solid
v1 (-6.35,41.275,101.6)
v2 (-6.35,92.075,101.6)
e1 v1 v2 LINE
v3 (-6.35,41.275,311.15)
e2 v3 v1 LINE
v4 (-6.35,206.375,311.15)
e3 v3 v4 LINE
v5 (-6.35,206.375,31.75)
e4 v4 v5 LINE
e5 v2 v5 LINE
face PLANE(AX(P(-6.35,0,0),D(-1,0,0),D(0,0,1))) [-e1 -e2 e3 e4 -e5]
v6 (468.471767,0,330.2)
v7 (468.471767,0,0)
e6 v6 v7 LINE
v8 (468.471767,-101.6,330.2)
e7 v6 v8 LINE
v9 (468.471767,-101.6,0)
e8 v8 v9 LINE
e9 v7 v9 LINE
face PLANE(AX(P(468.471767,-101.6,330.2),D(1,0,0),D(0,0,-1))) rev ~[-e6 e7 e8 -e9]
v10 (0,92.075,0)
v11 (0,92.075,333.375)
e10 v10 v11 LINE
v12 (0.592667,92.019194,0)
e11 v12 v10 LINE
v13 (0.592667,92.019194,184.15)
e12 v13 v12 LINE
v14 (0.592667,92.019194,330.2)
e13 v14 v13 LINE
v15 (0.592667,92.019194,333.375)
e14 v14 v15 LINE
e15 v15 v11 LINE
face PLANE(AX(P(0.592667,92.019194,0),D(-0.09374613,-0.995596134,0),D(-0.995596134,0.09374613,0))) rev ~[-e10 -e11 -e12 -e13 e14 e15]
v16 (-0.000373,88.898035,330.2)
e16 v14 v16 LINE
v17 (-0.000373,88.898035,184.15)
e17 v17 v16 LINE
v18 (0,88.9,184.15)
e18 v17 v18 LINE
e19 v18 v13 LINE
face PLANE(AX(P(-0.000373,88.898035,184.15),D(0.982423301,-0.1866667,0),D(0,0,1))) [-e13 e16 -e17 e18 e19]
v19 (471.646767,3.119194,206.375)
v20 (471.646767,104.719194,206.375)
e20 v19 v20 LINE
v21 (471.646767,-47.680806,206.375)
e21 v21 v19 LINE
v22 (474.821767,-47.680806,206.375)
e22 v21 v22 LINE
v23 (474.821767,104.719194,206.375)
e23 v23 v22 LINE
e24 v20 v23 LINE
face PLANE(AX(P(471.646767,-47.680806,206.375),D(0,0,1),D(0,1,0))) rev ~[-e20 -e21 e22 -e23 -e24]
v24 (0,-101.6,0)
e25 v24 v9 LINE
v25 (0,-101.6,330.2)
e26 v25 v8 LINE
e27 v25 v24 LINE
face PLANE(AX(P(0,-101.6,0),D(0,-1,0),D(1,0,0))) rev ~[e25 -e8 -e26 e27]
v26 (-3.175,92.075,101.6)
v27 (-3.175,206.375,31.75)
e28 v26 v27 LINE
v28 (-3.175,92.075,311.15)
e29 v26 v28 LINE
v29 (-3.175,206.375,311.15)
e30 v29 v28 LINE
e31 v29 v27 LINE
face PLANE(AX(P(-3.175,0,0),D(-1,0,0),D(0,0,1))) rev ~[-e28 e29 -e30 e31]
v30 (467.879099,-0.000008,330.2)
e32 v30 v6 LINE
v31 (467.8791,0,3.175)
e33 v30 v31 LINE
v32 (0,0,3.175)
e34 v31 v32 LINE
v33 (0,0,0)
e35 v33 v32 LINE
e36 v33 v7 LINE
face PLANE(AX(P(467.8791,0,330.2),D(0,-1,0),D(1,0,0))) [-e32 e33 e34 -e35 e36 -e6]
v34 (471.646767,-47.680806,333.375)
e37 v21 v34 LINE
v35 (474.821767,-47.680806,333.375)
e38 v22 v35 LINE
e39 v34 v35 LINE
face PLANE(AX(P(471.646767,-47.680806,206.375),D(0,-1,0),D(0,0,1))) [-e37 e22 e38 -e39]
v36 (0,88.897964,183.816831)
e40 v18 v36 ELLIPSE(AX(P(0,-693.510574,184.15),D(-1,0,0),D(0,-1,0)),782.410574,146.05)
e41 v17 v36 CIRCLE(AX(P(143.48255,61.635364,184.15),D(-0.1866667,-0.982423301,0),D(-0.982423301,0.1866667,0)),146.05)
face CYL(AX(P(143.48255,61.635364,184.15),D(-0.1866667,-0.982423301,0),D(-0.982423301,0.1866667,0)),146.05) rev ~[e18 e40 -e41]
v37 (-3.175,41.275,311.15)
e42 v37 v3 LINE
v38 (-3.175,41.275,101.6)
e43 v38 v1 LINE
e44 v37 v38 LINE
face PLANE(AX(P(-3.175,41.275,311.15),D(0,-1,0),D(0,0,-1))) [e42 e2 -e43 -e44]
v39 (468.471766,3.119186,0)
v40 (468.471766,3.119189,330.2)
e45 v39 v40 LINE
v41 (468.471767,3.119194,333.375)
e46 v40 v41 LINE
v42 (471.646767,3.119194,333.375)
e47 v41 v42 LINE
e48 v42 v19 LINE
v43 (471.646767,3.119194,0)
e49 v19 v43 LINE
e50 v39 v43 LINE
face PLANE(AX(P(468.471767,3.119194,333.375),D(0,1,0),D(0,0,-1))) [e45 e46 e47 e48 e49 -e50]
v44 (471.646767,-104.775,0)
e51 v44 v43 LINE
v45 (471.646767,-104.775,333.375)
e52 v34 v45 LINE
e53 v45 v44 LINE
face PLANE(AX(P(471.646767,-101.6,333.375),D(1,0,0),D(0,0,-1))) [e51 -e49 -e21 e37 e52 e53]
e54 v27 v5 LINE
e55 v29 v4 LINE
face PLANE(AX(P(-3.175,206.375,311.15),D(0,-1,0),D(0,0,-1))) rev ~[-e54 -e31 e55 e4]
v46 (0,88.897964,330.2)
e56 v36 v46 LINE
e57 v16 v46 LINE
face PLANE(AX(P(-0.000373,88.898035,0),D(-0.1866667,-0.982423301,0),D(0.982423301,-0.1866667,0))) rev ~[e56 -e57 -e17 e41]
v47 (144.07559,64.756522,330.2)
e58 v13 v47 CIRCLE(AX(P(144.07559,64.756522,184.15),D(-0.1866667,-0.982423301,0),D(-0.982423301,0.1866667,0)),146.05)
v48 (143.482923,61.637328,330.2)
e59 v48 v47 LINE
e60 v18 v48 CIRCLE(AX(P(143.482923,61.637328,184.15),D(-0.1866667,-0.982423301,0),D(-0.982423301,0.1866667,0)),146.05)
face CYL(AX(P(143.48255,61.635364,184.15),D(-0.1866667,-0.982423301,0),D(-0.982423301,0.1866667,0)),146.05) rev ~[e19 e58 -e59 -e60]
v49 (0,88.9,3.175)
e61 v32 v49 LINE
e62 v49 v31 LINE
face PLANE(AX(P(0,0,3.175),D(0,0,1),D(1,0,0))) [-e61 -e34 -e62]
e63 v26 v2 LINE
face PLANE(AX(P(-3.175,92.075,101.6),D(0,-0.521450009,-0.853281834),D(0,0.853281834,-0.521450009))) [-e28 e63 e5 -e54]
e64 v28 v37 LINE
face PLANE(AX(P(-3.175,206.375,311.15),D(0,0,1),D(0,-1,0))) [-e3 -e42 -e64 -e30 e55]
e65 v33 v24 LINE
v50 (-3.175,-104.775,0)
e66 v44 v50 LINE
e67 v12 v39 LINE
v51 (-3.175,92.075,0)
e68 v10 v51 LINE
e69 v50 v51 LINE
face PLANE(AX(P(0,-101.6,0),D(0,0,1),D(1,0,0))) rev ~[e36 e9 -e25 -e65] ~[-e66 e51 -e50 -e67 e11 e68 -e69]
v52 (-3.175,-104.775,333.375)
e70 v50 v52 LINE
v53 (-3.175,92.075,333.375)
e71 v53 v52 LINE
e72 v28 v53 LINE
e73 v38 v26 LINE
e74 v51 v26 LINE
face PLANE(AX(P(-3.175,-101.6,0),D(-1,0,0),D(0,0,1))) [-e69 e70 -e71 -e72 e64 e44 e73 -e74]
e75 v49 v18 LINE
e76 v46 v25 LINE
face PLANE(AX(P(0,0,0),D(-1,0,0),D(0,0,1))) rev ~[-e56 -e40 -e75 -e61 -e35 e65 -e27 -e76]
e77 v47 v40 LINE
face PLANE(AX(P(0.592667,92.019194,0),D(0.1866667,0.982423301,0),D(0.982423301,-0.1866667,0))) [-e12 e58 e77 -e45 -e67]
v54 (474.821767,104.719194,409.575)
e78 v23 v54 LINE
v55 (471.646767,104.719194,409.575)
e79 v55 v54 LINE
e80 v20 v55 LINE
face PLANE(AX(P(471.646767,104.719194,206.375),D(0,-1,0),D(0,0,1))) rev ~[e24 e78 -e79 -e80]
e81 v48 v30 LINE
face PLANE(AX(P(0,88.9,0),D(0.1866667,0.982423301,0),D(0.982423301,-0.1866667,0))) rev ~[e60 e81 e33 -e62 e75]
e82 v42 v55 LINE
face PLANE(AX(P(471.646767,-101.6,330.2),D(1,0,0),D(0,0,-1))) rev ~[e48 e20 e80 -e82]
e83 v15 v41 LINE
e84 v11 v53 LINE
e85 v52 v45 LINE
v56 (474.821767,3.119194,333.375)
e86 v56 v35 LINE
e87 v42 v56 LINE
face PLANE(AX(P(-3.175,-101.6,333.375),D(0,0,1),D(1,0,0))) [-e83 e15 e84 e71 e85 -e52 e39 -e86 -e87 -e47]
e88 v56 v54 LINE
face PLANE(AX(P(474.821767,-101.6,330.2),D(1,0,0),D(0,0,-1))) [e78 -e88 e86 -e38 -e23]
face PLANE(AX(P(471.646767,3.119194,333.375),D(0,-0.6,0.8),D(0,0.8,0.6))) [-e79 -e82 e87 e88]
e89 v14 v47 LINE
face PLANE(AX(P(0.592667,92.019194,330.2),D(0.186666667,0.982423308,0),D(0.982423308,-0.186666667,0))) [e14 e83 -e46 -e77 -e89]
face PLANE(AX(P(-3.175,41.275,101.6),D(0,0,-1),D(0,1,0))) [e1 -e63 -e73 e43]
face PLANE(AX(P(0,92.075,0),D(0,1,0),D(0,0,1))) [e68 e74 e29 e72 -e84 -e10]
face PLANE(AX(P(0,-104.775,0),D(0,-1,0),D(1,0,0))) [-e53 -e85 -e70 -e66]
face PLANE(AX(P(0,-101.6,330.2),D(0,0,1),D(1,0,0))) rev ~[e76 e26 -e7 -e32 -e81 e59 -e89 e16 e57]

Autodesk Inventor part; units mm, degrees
ref_plane "YZ Plane" through (0, 0, 0) normal (1, 0, 0) x (0, 1, 0)
ref_plane "XZ Plane" through (0, 0, 0) normal (0, 1, 0) x (-1, 0, 0)
ref_plane "XY Plane" through (0, 0, 0) normal (0, 0, 1) x (1, 0, 0)
sketch "Sketch1" plane through (0, 0, 0) normal (0, 0, 1) x (1, 0, 0)
  line L0 (0, 0) -> (0, 88.9)
  line L1 (0, 88.9) -> (467.8791, 0)
  line L2 (467.8791, 0) -> (0, 0)
  dimension "d0" = 88.9
  dimension "d4" = 476.25
  dimension "d5" = 90
extrude "Extrusion1" add sketch "Sketch1" along normal blind 3.175
sketch "Sketch2" plane through (0, 88.9, 0) normal (0.1866667, 0.9824233, 0) x (0.9824233, -0.1866667, 0)
  line L0 (0, 0) -> (476.25, 0) projected
  line L1 (0, 0) -> (0, -3.175) projected
  line L2 (476.25, -3.175) -> (0, -3.175) projected
  line L3 (476.25, 0) -> (476.25, -3.175) projected
  line L4 (0, -3.175) -> (0, -330.2)
  line L5 (0, -330.2) -> (476.25, -330.2)
  line L6 (476.25, -330.2) -> (476.25, -3.175)
  point P0 (16.594667, 0)
  dimension "d6" = 330.2
extrude "Extrusion2" add sketch "Sketch2" along normal blind 3.175
sketch "Sketch3" plane through (0, 0, 0) normal (-1, 0, 0) x (0, 0, 1)
  line L0 (0, 0) -> (0, 88.9) projected
  line L1 (0, 0) -> (3.175, 0) projected
  line L2 (3.175, 88.9) -> (3.175, 0) projected
  line L3 (0, 88.9) -> (3.175, 88.9) projected
  line L4 (0, 88.9) -> (0, 92.075)
  line L5 (0, 92.075) -> (330.2, 92.075)
  line L6 (330.2, 92.075) -> (330.2, 0)
  line L7 (330.2, 0) -> (330.2, -101.6)
  line L8 (330.2, -101.6) -> (0, -101.6)
  line L9 (0, -101.6) -> (0, 0)
  dimension "d9" = 3.175
  dimension "d10" = 330.2
  dimension "d11" = 101.6
extrude "Extrusion3" add sketch "Sketch3" along normal blind 3.175
sketch "Sketch4" plane through (0, 0, 0) normal (0, 0, -1) x (-1, 0, 0)
  line L0 (0, 88.9) -> (-0.592667, 92.019194)
  line L1 (0, 92.075) -> (0, 88.9)
  line L2 (-0.592667, 92.019194) -> (0, 92.075)
extrude "Extrusion4" add sketch "Sketch4" against normal blind 330.2
sketch "Sketch5" plane through (0, -101.6, 330.2) normal (0, 0, 1) x (1, 0, 0)
  line L0 (0, 190.5) -> (467.8791, 101.6)
  line L1 (467.8791, 101.6) -> (468.471767, 104.719194)
  line L2 (0.592667, 193.619194) -> (468.471767, 104.719194)
  line L3 (0.592667, 193.619194) -> (0, 193.675)
  line L4 (0, 193.675) -> (-3.175, 193.675)
  line L5 (-3.175, 0) -> (-3.175, 193.675)
  line L6 (0, 0) -> (-3.175, 0)
  line L7 (0, 0) -> (0, 190.5)
  line L8 (468.471767, 104.719194) -> (468.471767, 0)
  line L9 (468.471767, 0) -> (0, 0)
  point P0 (0, 101.6)
extrude "Extrusion5" add sketch "Sketch5" along normal blind 3.175
sketch "Sketch6" plane through (0, -101.6, 330.2) normal (0, 0, -1) x (-1, 0, 0)
  line L0 (-467.8791, 101.6) -> (-468.471767, 104.719194)
  line L1 (-468.471767, 0) -> (-468.471767, 104.719194)
  line L2 (-467.8791, 101.6) -> (-468.471767, 101.6)
  point P0 (0, 101.6)
extrude "Extrusion6" add sketch "Sketch6" along normal blind 330.2
sketch "Sketch7" plane through (468.471767, -101.6, 330.2) normal (1, 0, 0) x (0, 0, -1)
  line L0 (0, 0) -> (0, 101.6)
  line L1 (0, 101.6) -> (330.2, 101.6)
  line L2 (330.2, 104.719194) -> (330.2, 101.6)
  line L3 (-3.175, 104.719194) -> (330.2, 104.719194)
  line L4 (-3.175, 0) -> (-3.175, 104.719194)
  line L5 (0, 0) -> (-3.175, 0)
  line L6 (0, 0) -> (330.2, 0)
  line L7 (330.2, 0) -> (330.2, 101.6)
extrude "Extrusion7" add sketch "Sketch7" along normal blind 3.175
sketch "Sketch8" plane through (0, -101.6, 0) normal (0, -1, 0) x (1, 0, 0)
  line L0 (0, 0) -> (0, 330.2)
  line L1 (471.646767, 333.375) -> (471.646767, 0)
  line L2 (-3.175, 333.375) -> (471.646767, 333.375)
  line L3 (-3.175, 0) -> (-3.175, 333.375)
  line L4 (0, 0) -> (-3.175, 0)
  line L5 (0, 0) -> (471.646767, 0)
extrude "Extrusion8" add sketch "Sketch8" along normal blind 3.175
sketch "Sketch9" plane through (0, 88.9, 0) normal (-0.1866667, -0.9824233, 0) x (0.9824233, -0.1866667, 0)
  line L0 (0, 330.2) -> (476.25, 330.2) projected
  line L1 (0, 3.175) -> (0, 330.2) projected
  arc A0 (0, 184.15) -> (146.05, 330.2) centre (146.05, 184.15) ccw
  point P0 (16.594667, 0)
  dimension "d24" = 292.1
extrude "Extrusion9" cut sketch "Sketch9" against normal blind 3.175
sketch "Sketch10" plane through (471.646767, -101.6, 330.2) normal (1, 0, 0) x (0, 0, -1)
  line L0 (330.2, 104.719194) -> (-3.175, 104.719194)
  line L1 (-3.175, 104.719194) -> (-3.175, -3.175)
  line L2 (330.2, -3.175) -> (-3.175, -3.175)
  line L3 (123.825, 53.919194) -> (123.825, 206.319194)
  line L4 (123.825, 206.319194) -> (-79.375, 206.319194)
  line L5 (123.825, 53.919194) -> (-3.175, 53.919194)
  line L6 (-3.175, 53.919194) -> (-3.175, 104.719194)
  line L7 (-3.175, 104.719194) -> (-3.175, 104.719194)
  line L8 (-3.175, 104.719194) -> (-79.375, 206.319194)
  point P0 (330.2, 101.6)
  dimension "d30" = 152.4
  dimension "d31" = 203.2
  dimension "d32" = 127
  dimension "d33" = 50.8
  dimension "d34" = 0
  dimension "d35" = 0
  dimension "d47" = 0
extrude "Extrusion10" add sketch "Sketch10" along normal blind 3.175
sketch "Sketch11" plane through (-3.175, 0, 0) normal (-1, 0, 0) x (0, 0, 1)
  line L0 (333.375, 92.075) -> (333.375, -104.775) projected
  line L1 (0, 92.075) -> (333.375, 92.075) projected
  line L2 (311.15, 206.375) -> (31.75, 206.375)
  line L3 (311.15, 206.375) -> (311.15, 41.275)
  line L4 (311.15, 41.275) -> (101.6, 41.275)
  line L5 (101.6, 41.275) -> (101.6, 92.075)
  line L6 (101.6, 92.075) -> (31.75, 206.375)
  point P0 (0, 0)
  dimension "d39" = 279.4
  dimension "d40" = 165.1
  dimension "d41" = 209.55
  dimension "d42" = 50.8
  dimension "d43" = 0
  dimension "d44" = 22.225
extrude "Extrusion11" add sketch "Sketch11" along normal blind 3.175
properties part number "Hopper" material "Glass"
